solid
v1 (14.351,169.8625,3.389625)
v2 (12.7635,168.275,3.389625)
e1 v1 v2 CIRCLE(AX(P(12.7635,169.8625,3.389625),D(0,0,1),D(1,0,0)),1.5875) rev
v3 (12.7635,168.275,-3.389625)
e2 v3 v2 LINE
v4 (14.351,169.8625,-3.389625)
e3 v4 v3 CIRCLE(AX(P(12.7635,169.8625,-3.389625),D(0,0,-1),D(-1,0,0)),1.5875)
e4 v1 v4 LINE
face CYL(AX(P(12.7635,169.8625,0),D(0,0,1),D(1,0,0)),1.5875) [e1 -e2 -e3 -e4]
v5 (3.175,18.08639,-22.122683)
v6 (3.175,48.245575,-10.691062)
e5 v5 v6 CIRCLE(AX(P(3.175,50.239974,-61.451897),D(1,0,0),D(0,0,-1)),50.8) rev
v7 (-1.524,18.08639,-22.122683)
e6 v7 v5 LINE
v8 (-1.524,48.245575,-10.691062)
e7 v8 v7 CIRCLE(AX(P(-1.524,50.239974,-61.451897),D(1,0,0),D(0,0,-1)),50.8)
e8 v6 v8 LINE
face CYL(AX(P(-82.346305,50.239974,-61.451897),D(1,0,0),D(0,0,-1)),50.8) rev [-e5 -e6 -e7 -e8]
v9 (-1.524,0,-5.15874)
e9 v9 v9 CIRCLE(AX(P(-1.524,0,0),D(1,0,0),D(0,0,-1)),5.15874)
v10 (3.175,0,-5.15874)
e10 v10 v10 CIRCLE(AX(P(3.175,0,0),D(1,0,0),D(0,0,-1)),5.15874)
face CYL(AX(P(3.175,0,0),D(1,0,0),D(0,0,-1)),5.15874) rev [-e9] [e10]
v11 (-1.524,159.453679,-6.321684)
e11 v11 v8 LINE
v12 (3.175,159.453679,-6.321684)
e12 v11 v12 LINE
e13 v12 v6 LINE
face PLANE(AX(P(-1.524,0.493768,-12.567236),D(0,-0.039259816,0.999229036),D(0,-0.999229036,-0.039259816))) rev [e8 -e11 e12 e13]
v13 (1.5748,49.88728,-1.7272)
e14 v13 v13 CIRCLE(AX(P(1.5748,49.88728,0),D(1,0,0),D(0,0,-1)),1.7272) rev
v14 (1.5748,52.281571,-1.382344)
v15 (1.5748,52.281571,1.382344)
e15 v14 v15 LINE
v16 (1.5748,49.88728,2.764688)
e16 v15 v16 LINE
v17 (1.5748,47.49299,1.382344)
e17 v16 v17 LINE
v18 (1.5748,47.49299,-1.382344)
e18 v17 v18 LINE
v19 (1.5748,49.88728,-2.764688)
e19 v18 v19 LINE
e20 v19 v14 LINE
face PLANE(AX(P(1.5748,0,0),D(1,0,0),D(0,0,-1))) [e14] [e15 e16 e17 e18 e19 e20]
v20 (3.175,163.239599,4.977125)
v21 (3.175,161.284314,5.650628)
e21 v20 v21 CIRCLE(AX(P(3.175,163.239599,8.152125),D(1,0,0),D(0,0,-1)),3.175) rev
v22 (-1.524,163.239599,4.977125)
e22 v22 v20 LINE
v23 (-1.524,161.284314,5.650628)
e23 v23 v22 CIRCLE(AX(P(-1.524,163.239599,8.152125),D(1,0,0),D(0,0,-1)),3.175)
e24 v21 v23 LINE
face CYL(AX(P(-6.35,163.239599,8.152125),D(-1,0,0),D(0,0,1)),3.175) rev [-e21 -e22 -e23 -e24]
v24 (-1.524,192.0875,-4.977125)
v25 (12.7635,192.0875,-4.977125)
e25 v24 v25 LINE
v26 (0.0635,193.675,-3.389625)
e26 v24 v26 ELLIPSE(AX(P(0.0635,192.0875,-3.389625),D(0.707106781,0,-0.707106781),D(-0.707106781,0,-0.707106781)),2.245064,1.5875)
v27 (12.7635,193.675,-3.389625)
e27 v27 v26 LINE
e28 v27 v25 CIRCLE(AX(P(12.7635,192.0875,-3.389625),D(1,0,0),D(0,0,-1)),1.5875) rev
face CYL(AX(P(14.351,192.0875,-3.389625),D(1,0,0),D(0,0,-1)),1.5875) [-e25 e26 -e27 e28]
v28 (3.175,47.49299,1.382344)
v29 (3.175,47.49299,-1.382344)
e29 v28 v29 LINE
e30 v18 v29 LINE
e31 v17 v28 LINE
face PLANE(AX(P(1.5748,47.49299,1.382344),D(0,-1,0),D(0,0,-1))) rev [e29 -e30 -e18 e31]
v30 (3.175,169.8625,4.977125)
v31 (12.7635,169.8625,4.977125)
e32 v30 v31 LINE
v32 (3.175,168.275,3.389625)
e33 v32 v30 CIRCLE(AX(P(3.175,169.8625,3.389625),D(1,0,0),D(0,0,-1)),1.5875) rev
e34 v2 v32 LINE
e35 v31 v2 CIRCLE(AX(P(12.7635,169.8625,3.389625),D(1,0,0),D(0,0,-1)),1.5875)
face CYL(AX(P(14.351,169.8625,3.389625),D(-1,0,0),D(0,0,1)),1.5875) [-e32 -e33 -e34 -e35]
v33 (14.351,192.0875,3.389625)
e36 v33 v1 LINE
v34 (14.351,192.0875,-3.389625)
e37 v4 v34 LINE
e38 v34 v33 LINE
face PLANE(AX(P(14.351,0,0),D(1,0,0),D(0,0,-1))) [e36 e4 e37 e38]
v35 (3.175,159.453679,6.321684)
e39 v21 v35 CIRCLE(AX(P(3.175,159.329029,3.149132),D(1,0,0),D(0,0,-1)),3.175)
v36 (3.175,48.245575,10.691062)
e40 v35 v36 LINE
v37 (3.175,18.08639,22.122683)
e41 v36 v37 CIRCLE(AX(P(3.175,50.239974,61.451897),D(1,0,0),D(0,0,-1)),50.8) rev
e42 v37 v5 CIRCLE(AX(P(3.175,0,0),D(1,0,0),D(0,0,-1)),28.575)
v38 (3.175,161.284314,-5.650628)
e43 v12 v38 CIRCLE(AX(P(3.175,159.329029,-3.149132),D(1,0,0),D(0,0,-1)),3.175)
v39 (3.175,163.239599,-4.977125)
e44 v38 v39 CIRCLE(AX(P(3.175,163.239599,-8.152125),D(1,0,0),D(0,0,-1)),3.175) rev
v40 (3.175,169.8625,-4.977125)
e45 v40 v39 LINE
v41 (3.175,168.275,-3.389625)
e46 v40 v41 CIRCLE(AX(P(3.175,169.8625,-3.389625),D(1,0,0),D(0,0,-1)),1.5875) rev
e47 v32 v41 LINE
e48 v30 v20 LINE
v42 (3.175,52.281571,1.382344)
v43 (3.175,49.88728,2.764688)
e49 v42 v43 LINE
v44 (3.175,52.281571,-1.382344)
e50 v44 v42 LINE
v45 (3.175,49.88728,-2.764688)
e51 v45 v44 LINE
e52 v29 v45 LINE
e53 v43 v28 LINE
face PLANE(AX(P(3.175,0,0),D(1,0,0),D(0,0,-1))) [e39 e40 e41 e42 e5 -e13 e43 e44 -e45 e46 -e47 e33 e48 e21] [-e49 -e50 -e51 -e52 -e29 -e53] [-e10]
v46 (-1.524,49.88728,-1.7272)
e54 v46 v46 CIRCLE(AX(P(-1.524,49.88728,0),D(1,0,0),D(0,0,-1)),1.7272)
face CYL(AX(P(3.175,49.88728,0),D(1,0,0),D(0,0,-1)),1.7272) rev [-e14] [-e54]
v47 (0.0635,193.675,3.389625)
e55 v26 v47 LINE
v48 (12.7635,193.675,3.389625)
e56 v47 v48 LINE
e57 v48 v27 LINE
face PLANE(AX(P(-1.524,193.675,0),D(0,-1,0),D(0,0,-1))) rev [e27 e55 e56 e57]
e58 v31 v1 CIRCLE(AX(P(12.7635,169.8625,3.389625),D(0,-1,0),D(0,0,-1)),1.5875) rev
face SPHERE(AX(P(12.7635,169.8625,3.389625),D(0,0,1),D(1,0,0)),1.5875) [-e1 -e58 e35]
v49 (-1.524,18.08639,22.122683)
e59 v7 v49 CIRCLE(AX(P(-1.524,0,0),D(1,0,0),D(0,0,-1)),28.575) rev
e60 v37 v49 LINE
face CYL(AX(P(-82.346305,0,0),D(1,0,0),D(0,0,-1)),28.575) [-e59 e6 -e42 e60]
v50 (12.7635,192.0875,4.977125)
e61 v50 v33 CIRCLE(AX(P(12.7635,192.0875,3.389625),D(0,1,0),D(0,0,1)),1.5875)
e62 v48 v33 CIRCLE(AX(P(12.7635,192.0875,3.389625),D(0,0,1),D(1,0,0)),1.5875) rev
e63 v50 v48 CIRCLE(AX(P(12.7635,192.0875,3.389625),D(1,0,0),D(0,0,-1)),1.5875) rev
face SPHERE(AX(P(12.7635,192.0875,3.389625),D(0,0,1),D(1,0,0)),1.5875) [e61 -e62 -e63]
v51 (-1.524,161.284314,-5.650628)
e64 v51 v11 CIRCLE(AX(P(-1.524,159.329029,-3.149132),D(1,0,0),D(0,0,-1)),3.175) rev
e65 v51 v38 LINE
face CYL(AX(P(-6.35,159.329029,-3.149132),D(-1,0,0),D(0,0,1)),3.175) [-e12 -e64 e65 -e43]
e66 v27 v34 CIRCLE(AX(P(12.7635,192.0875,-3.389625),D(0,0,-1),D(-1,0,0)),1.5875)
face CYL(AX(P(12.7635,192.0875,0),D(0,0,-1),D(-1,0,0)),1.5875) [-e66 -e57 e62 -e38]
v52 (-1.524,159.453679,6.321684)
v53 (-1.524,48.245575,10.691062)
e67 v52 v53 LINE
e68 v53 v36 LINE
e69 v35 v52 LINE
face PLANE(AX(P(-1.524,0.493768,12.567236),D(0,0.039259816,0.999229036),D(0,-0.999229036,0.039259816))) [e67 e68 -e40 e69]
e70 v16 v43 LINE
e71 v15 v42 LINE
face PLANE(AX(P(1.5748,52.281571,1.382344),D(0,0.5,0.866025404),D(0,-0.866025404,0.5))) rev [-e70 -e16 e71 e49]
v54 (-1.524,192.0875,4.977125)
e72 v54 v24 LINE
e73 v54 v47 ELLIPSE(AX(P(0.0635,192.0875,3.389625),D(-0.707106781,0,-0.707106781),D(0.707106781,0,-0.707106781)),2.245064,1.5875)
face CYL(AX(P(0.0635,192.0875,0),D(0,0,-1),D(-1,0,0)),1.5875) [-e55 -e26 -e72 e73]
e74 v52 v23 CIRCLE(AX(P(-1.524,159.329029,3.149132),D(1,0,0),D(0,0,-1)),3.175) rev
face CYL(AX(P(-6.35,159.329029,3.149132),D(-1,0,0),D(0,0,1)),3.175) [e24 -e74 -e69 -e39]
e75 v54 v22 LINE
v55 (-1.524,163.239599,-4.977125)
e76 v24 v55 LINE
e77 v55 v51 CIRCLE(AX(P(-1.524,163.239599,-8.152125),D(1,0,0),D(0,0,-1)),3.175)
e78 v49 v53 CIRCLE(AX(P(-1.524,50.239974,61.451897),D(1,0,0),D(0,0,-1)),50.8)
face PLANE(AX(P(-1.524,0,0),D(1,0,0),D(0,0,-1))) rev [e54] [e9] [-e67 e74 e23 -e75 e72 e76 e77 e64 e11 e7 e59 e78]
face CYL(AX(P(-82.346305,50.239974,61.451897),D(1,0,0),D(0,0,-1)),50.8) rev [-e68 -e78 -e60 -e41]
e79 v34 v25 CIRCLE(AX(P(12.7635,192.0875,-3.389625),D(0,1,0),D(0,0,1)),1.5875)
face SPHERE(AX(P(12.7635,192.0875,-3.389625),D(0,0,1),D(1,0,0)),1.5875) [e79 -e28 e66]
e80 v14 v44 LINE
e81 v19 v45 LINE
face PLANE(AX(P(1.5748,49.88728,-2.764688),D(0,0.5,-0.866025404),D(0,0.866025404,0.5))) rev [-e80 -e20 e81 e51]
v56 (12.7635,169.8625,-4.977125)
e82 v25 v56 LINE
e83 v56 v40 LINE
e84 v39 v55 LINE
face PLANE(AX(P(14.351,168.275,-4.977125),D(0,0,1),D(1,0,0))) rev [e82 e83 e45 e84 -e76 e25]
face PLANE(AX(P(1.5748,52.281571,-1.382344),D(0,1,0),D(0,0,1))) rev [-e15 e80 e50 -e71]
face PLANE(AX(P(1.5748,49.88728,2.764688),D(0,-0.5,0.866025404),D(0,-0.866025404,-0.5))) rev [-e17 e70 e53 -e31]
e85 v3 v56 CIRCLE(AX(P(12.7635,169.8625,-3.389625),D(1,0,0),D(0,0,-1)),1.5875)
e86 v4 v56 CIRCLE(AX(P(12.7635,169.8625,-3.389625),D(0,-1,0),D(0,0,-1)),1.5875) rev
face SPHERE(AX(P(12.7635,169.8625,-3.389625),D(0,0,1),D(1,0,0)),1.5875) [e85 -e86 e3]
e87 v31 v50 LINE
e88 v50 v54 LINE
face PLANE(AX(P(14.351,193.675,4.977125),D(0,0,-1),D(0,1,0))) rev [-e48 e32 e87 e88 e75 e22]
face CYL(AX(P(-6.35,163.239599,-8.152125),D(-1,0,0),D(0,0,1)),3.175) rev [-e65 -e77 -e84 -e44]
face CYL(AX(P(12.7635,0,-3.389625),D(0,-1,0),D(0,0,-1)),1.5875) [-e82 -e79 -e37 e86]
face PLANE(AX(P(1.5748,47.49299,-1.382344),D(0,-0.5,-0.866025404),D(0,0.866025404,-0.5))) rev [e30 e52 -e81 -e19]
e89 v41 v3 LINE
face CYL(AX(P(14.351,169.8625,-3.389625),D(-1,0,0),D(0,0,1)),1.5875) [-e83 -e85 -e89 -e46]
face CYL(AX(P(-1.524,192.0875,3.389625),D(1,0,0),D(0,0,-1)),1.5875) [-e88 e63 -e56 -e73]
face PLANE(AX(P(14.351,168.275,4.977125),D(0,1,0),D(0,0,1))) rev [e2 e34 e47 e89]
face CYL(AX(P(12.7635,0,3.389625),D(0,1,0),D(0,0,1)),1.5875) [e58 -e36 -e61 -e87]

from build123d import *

# Parameters (mm, degrees)
SKETCH2_R                = 28.575
SKETCH2_R_2              = 11.1125
BOSS_EXTRUDE1_DEPTH      = 6.35
BOSS_EXTRUDE2_DEPTH      = 3.175
BOSS_EXTRUDE2_DEPTH_BACK = 1.524
SKETCH3_W                = 9.954249144
SKETCH3_H                = 25.4
BOSS_EXTRUDE3_DEPTH      = 11.176
SKETCH4_W                = 1.247460898
SKETCH4_H                = 31.75
CUT_EXTRUDE1_DEPTH       = 197.090385348
FILLET2_R                = 3.175
FILLET4_R                = 3.175
FILLET7_R                = 1.5875
SKETCH5_R                = 28.575
CUT_EXTRUDE2_DEPTH       = 197.296936937
SKETCH6_R                = 28.575
BOSS_EXTRUDE4_DEPTH      = 4.699
F_3_8_CLEARANCE_HOLE1_D  = 10.31748
FILLET9_R                = 50.8
F_4_CLEARANCE_HOLE1_D    = 3.4544
CUT_EXTRUDE3_DEPTH       = 1.6002


with BuildPart() as part:
    # Sketch2 → Boss-Extrude1 (new body)
    with BuildSketch(Plane(origin=(0, 0, 0), x_dir=(0, 0, -1), z_dir=(1, 0, 0))):
        Circle(SKETCH2_R)
        Circle(SKETCH2_R_2, mode=Mode.SUBTRACT)
    extrude(amount=-BOSS_EXTRUDE1_DEPTH)

    # Sketch2<5> → Boss-Extrude2 (add, two sides: drawn at the far end of the back side and taken through both)
    with BuildSketch(Plane(origin=(0, 0, 0), x_dir=(0, 0, -1), z_dir=(1, 0, 0)).offset(-BOSS_EXTRUDE2_DEPTH_BACK)):
        with BuildLine():
            Line((11.55989339, 26.132345662), (4.977124572, 193.675))
            Line((4.977124572, 193.675), (0, 193.675))
            Line((0, 193.675), (0, 28.575))
            ThreePointArc((0, 28.575), (5.907573431, 27.957668021), (11.55989339, 26.132345662))
        make_face()
        with BuildLine():
            Line((0, 28.575), (0, 193.675))
            Line((0, 193.675), (-4.977124572, 193.675))
            Line((-4.977124572, 193.675), (-11.55989339, 26.132345662))
            ThreePointArc((-11.55989339, 26.132345662), (-5.907573431, 27.957668021), (0, 28.575))
        make_face()
    extrude(amount=BOSS_EXTRUDE2_DEPTH + BOSS_EXTRUDE2_DEPTH_BACK)

    # Sketch3 → Boss-Extrude3 (add)
    with BuildSketch(Plane(origin=(3.175, 0, 0), x_dir=(0, 0, -1), z_dir=(1, 0, 0))):
        with Locations((0, 180.975)):
            Rectangle(SKETCH3_W, SKETCH3_H)
    extrude(amount=BOSS_EXTRUDE3_DEPTH)

    # Sketch4 → Cut-Extrude1 (cut, through all)
    with BuildSketch(Plane(origin=(3.175, 0, 0), x_dir=(0, 0, -1), z_dir=(1, 0, 0))):
        with Locations((-5.600855021, 177.8)):
            Rectangle(SKETCH4_W, SKETCH4_H)
        with Locations((5.600855021, 177.8)):
            Rectangle(SKETCH4_W, SKETCH4_H)
    extrude(amount=-CUT_EXTRUDE1_DEPTH, mode=Mode.SUBTRACT)

    # Fillet2
    # the kernel refuses this fillet: 3.175 mm, written as the material it takes off along each edge
    with BuildSketch(Plane(origin=(9.358070531, 161.925, 6.22458547), x_dir=(0, -0.999229036240723, 0.039259815759068305), z_dir=(-1, 0, 0))) as fillet2_piece_1:
        with BuildLine():
            CenterArc((2.473228212, -3.175), FILLET2_R, 90, 52.598124578)
            Line((-0.048975085, -1.24649915), (-0.099419151, -1.207929133))
            ThreePointArc((-0.099419151, -1.207929133), (-0.087938586, -0.620756577), (-0.063451044, 0.002492998))
            Line((-0.063451044, 0.002492998), (0, 0.0635))
            Line((0, 0.0635), (2.473228212, 0.0635))
            Line((2.473228212, 0.0635), (2.473228212, 0))
        make_face()
    extrude(amount=17.065141061, mode=Mode.SUBTRACT)
    with BuildSketch(Plane(origin=(9.358070531, 161.925, -6.22458547), x_dir=(0, 0, 1), z_dir=(-1, 0, 0))) as fillet2_piece_2:
        with BuildLine():
            CenterArc((3.075453706, -2.595971358), FILLET2_R, 125.151875422, 52.598124578)
            Line((-0.097098484, -2.471321443), (-0.160549528, -2.468828445))
            Line((-0.160549528, -2.468828445), (-0.063451044, 0.002492998))
            Line((-0.063451044, 0.002492998), (0, 0.0635))
            ThreePointArc((0, 0.0635), (0.623730449, 0.0635), (1.210901041, 0.051919427))
            Line((1.210901041, 0.051919427), (1.247460897, 0))
        make_face()
    extrude(amount=17.065141061, mode=Mode.SUBTRACT)

    # Fillet4
    fillet4_edges = [part.edges().sort_by_distance(p)[0] for p in [
        (0.8255, 161.925, 4.977124572),
        (0.8255, 161.925, -4.977124572),
    ]]
    fillet(fillet4_edges, radius=FILLET4_R)

    # Fillet7
    fillet7_edges = [part.edges().sort_by_distance(p)[0] for p in [
        (6.4135, 193.675, 4.977124572),
        (6.4135, 193.675, -4.977124572),
        (-1.524, 193.675, 0),
        (8.763, 168.275, 4.977124572),
        (8.763, 168.275, -4.977124572),
        (14.351, 193.675, 0),
        (14.351, 180.975, 4.977124572),
        (14.351, 168.275, 0),
        (14.351, 180.975, -4.977124572),
    ]]
    fillet(fillet7_edges, radius=FILLET7_R)

    # Sketch5 → Cut-Extrude2 (cut, through all)
    with BuildSketch(Plane(origin=(0, 0, 0), x_dir=(0, 0, -1), z_dir=(1, 0, 0))):
        Circle(SKETCH5_R)
    extrude(amount=-CUT_EXTRUDE2_DEPTH, mode=Mode.SUBTRACT)

    # Sketch6 → Boss-Extrude4 (add)
    with BuildSketch(Plane(origin=(3.175, 0, 0), x_dir=(0, 0, -1), z_dir=(1, 0, 0))):
        Circle(SKETCH6_R)
    extrude(amount=-BOSS_EXTRUDE4_DEPTH)

    # 3/8 Clearance Hole1 (through all)
    with Locations(Plane(origin=(3.175, 0, 0), x_dir=(0, 0, -1), z_dir=(1, 0, 0))):
        with Locations((0, 0)):
            Hole(F_3_8_CLEARANCE_HOLE1_D / 2)

    # Fillet9
    fillet9_edges = [part.edges().sort_by_distance(p)[0] for p in [
        (0.8255, 26.132345662, -11.55989339),
        (0.8255, 26.132345662, 11.55989339),
    ]]
    fillet(fillet9_edges, radius=FILLET9_R)

    # #4 Clearance Hole1 (through all)
    with Locations(Plane(origin=(3.175, 0, 0), x_dir=(0, 0, -1), z_dir=(1, 0, 0))):
        with Locations((0, 49.88728048)):
            Hole(F_4_CLEARANCE_HOLE1_D / 2)

    # Sketch11 → Cut-Extrude3 (cut)
    with BuildSketch(Plane(origin=(3.175, 0, 0), x_dir=(0, 0, -1), z_dir=(1, 0, 0))):
        Polygon((-1.382344076, 47.492990308), (1.382344076, 47.492990308), (2.764688151, 49.88728048), (1.382344076, 52.281570653), (-1.382344076, 52.281570653), (-2.764688151, 49.88728048), align=None)
    extrude(amount=-CUT_EXTRUDE3_DEPTH, mode=Mode.SUBTRACT)


solid = part.part
